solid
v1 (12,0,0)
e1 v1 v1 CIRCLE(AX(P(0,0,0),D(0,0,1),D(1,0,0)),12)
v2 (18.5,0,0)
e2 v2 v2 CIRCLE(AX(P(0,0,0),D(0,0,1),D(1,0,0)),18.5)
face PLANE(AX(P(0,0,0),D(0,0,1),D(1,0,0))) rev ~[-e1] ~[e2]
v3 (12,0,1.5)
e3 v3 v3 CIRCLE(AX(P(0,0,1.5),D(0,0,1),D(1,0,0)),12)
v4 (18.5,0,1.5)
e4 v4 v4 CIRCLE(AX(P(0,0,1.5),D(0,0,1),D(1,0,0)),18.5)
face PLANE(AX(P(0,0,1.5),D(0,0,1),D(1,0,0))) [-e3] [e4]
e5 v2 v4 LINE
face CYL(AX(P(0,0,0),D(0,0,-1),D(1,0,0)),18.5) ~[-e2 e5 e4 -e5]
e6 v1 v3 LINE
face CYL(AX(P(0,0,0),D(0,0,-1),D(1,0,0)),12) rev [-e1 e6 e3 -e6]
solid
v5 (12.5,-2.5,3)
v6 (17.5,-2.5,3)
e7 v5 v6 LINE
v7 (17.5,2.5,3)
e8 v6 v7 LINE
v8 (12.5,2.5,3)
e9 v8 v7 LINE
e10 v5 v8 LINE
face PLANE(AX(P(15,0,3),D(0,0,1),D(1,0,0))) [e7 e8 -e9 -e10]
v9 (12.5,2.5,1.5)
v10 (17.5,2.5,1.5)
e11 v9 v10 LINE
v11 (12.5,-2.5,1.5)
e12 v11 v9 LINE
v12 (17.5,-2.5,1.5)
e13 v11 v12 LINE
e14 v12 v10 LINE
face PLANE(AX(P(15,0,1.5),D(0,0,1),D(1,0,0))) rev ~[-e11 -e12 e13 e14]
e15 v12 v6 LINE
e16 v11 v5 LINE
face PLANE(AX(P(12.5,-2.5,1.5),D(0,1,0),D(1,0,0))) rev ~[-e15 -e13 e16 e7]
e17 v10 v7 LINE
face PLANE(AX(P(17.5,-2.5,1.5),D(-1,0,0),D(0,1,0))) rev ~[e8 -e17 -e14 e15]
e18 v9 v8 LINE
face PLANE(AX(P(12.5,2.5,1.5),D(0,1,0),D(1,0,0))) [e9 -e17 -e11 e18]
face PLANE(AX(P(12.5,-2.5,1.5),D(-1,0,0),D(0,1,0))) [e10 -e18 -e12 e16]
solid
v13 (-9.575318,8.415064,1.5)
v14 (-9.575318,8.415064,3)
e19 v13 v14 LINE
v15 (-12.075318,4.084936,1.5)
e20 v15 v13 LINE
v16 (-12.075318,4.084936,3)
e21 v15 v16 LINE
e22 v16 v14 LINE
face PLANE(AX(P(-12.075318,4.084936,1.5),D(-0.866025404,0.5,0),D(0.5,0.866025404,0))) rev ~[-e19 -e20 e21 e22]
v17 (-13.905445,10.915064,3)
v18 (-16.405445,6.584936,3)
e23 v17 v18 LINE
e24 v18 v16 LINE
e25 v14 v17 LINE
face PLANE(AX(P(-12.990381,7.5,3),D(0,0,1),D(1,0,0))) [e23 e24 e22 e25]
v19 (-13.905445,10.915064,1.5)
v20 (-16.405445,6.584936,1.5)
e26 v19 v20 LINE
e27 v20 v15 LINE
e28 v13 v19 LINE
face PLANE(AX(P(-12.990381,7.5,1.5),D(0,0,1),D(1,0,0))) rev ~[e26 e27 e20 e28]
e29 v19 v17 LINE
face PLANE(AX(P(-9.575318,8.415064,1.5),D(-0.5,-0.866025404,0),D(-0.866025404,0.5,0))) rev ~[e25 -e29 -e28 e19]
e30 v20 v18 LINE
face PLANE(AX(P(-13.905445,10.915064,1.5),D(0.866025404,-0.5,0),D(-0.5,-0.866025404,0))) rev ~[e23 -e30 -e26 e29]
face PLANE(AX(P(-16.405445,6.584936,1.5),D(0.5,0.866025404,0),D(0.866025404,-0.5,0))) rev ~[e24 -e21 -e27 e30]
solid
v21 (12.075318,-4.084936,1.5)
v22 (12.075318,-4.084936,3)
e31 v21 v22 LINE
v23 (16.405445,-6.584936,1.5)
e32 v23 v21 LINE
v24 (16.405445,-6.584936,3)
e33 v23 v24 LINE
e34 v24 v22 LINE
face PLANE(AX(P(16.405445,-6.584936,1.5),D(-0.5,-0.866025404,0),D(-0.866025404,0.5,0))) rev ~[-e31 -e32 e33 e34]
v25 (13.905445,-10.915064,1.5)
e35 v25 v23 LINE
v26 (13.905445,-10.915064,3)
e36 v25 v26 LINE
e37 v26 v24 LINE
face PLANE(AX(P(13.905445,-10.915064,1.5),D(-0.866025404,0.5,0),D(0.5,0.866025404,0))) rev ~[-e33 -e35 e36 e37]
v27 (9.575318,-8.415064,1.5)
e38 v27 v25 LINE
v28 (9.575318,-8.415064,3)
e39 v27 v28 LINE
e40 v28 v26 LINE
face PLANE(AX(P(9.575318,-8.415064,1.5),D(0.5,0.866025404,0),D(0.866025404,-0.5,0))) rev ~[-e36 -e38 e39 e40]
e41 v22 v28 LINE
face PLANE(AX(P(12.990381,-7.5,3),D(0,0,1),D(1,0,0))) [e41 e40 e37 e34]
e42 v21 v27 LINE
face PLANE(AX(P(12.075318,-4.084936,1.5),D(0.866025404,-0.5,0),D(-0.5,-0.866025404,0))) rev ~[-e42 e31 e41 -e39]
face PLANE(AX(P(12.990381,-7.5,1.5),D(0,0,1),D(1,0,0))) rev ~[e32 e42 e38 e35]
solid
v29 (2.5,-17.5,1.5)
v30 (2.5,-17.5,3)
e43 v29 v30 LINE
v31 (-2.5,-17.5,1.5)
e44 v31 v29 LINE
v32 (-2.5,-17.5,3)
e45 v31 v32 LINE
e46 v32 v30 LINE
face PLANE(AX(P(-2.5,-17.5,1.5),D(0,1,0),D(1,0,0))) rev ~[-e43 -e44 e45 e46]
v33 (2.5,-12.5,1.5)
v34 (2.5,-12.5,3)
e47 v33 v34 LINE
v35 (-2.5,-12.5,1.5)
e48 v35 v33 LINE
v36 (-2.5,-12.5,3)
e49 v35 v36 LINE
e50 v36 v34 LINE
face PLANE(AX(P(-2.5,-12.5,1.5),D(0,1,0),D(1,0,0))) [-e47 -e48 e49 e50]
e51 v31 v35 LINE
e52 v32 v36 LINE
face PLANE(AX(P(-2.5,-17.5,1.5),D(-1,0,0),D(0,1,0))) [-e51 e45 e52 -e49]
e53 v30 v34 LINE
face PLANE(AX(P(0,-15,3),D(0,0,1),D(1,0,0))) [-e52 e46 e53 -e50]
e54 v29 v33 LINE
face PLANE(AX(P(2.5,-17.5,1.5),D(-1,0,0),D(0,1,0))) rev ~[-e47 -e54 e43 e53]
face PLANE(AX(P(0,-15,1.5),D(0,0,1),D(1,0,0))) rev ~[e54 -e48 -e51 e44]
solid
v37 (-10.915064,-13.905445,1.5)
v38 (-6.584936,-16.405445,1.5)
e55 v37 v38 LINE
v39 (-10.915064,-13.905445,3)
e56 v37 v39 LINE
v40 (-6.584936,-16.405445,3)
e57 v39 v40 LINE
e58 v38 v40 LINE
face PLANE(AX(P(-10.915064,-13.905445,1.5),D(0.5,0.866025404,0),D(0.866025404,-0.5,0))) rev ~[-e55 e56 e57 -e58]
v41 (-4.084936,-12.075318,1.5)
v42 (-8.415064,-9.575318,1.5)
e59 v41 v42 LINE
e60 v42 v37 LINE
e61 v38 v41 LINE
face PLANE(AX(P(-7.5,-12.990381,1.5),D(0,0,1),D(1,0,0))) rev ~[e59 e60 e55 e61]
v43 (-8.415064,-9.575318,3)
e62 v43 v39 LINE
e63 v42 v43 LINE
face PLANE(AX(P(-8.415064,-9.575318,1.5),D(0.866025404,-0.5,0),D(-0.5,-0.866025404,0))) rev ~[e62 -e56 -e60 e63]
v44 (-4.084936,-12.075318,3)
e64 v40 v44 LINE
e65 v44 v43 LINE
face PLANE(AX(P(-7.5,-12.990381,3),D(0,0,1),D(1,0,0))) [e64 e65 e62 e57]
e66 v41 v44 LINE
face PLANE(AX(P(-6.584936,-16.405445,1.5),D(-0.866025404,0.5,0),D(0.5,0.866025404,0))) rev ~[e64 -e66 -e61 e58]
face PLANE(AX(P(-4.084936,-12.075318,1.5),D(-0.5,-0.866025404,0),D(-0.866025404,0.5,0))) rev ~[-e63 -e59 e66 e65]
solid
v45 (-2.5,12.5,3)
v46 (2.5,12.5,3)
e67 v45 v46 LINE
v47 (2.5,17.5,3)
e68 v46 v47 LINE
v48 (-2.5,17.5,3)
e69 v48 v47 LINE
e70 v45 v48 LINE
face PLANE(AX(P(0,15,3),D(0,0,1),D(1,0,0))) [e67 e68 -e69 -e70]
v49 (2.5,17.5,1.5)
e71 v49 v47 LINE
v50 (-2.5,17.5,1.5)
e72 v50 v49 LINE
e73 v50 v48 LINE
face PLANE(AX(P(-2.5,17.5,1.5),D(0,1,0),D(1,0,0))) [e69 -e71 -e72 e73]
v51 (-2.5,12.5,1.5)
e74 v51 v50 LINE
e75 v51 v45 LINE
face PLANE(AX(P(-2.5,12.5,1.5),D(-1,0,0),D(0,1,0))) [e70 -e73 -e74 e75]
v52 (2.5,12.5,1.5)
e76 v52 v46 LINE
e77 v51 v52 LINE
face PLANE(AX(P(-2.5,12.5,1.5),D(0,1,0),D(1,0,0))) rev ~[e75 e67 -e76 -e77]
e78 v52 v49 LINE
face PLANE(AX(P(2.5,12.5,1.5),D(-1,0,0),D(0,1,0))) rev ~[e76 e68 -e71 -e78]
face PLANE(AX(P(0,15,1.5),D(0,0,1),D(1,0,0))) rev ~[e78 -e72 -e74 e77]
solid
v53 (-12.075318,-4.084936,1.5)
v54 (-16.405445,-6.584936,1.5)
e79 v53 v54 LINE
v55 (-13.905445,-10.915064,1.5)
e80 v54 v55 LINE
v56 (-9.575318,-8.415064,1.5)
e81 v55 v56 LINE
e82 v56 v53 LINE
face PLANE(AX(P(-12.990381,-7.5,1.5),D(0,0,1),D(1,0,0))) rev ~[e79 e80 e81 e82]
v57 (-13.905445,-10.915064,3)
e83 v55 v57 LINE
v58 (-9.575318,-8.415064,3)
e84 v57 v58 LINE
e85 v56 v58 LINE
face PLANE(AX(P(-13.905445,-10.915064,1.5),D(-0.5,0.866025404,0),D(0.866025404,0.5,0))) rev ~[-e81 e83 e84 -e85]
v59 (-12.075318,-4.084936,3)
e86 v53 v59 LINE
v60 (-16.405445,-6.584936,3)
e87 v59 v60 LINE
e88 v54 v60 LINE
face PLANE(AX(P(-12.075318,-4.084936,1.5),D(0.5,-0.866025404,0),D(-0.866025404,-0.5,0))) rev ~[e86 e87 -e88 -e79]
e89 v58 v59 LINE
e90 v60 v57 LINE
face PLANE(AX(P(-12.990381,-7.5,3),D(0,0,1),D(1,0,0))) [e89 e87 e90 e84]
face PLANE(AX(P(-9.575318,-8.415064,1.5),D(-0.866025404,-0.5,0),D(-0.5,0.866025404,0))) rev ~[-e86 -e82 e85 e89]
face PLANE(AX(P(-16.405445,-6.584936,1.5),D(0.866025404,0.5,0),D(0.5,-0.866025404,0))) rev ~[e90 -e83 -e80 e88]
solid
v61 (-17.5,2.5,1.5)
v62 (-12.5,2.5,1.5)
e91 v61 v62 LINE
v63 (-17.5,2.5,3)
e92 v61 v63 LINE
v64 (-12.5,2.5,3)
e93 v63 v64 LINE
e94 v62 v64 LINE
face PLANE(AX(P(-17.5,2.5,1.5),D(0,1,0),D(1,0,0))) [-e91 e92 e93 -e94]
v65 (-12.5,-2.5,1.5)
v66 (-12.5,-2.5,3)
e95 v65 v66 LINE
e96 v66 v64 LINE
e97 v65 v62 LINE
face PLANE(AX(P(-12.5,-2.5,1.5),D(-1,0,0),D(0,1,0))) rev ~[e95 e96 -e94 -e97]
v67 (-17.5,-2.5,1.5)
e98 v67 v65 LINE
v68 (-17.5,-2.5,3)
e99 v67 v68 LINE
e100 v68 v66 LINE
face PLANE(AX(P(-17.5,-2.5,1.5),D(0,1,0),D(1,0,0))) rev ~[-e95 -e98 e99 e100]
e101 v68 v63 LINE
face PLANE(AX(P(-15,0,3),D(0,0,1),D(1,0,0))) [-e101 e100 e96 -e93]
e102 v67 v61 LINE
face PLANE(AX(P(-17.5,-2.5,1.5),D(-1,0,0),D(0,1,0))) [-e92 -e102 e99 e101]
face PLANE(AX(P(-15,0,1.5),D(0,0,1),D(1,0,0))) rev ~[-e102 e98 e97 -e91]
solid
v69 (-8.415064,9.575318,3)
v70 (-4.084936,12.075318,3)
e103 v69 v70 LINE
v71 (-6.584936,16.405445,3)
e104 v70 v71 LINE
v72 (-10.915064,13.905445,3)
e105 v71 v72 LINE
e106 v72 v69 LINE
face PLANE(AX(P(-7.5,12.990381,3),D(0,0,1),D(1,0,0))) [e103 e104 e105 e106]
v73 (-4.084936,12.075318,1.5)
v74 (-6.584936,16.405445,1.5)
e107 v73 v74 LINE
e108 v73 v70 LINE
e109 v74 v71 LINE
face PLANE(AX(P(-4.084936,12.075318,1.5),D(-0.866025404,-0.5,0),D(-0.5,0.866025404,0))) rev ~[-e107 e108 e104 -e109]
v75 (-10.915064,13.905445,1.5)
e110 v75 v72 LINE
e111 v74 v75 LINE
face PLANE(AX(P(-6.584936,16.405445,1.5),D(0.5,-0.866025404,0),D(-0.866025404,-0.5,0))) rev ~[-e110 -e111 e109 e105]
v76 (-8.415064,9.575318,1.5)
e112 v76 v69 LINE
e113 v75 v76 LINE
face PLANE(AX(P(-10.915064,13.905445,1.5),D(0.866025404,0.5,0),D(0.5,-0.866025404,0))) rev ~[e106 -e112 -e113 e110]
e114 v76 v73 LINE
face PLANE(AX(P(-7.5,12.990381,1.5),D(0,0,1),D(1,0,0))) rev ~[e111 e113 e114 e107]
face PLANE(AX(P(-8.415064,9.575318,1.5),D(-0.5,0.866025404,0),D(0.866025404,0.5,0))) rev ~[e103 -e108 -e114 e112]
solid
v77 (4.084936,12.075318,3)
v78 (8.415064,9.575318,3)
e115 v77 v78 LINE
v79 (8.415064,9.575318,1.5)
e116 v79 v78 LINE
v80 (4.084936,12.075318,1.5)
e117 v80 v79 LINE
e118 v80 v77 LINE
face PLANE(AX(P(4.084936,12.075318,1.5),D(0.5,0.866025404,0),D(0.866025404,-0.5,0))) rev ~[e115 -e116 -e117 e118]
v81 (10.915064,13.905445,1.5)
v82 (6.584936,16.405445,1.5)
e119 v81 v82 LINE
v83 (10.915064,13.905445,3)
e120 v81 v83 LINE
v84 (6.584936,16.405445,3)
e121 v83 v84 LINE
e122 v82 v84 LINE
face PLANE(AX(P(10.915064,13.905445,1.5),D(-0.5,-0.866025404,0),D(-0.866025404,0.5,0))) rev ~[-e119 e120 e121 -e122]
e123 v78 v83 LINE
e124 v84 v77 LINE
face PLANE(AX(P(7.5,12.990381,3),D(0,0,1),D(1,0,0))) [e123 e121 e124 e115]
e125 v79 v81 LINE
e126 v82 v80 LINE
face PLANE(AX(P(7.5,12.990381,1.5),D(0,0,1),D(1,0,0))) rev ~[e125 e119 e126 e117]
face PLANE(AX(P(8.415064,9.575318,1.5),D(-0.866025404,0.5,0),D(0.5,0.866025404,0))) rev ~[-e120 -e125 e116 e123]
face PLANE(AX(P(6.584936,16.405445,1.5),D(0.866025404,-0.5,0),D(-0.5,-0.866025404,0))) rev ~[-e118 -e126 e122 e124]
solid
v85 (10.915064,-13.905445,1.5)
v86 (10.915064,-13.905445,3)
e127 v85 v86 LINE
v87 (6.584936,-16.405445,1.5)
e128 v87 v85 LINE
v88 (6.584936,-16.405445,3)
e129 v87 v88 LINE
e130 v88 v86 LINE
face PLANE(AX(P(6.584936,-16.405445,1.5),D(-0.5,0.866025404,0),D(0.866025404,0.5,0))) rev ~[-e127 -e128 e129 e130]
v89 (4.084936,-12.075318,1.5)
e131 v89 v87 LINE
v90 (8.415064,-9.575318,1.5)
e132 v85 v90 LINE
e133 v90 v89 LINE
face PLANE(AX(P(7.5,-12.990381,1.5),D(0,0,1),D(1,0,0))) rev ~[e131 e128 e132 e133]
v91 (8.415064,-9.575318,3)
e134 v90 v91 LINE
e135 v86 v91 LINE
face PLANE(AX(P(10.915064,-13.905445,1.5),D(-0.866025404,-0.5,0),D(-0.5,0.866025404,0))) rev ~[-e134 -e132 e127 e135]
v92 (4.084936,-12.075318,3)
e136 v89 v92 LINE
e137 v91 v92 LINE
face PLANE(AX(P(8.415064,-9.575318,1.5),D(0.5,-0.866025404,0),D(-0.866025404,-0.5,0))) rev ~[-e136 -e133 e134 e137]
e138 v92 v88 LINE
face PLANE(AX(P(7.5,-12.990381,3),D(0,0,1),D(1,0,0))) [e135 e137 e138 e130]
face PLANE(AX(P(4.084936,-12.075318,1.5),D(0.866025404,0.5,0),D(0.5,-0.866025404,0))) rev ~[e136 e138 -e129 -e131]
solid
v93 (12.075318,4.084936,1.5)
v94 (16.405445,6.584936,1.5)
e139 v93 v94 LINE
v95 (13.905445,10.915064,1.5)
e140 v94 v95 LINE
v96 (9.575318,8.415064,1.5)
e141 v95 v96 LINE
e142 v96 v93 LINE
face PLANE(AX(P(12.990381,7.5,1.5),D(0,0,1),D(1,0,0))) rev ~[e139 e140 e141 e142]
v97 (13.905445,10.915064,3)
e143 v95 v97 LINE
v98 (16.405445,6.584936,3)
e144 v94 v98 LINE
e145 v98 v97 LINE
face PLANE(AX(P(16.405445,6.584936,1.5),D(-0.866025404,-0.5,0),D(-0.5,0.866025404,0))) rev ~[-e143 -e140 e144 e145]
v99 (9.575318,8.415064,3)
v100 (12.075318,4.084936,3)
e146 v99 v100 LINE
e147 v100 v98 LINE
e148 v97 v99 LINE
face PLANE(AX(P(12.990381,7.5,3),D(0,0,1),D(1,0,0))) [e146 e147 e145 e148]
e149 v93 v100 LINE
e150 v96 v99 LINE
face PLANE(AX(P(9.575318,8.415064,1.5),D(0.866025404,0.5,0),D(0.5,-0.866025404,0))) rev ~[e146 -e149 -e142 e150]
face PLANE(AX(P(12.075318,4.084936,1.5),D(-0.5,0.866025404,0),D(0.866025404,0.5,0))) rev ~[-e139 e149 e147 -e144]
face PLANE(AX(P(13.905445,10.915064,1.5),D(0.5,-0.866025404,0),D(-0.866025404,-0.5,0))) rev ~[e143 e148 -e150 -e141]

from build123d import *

# Parameters (mm, degrees)
F0_R     = 18.5
F0_R_2   = 12
F1_DEPTH = 1.5
F2_W     = 5
F2_H     = 5
F3_DEPTH = 1.5


# Not quite as in the source:
# - a feature of the source that left no trace in its solid (it failed there, or was rolled back) is left out


with BuildPart() as f1:
    # F0 (on Top) → F1 (new body)
    with BuildSketch(Plane.XY):
        Circle(F0_R)
        Circle(F0_R_2, mode=Mode.SUBTRACT)
    extrude(amount=F1_DEPTH)


with BuildPart() as f3:
    # F2 (on face) → F3 (new body)
    with BuildSketch(Plane.XY.offset(1.5)):
        with Locations((-15, 0)):
            Rectangle(F2_W, F2_H)
    extrude(amount=F3_DEPTH)


with BuildPart() as f3b:
    # F2 (on face) → F3, piece 2 (new body)
    with BuildSketch(Plane.XY.offset(1.5)):
        Polygon((-9.5753175473, -8.4150635095), (-12.0753175473, -4.0849364905), (-16.4054445662, -6.5849364905), (-13.9054445662, -10.9150635095), align=None)
    extrude(amount=F3_DEPTH)


with BuildPart() as f3c:
    # F2 (on face) → F3, piece 3 (new body)
    with BuildSketch(Plane.XY.offset(1.5)):
        Polygon((-4.0849364905, -12.0753175473), (-8.4150635095, -9.5753175473), (-10.9150635095, -13.9054445662), (-6.5849364905, -16.4054445662), align=None)
    extrude(amount=F3_DEPTH)


with BuildPart() as f3d:
    # F2 (on face) → F3, piece 4 (new body)
    with BuildSketch(Plane.XY.offset(1.5)):
        with Locations((0, -15)):
            Rectangle(F2_W, F2_H)
    extrude(amount=F3_DEPTH)


with BuildPart() as f3e:
    # F2 (on face) → F3, piece 5 (new body)
    with BuildSketch(Plane.XY.offset(1.5)):
        Polygon((8.4150635095, -9.5753175473), (4.0849364905, -12.0753175473), (6.5849364905, -16.4054445662), (10.9150635095, -13.9054445662), align=None)
    extrude(amount=F3_DEPTH)


with BuildPart() as f3f:
    # F2 (on face) → F3, piece 6 (new body)
    with BuildSketch(Plane.XY.offset(1.5)):
        Polygon((12.0753175473, -4.0849364905), (9.5753175473, -8.4150635095), (13.9054445662, -10.9150635095), (16.4054445662, -6.5849364905), align=None)
    extrude(amount=F3_DEPTH)


with BuildPart() as f3g:
    # F2 (on face) → F3, piece 7 (new body)
    with BuildSketch(Plane.XY.offset(1.5)):
        with Locations((15, 0)):
            Rectangle(F2_W, F2_H)
    extrude(amount=F3_DEPTH)


with BuildPart() as f3h:
    # F2 (on face) → F3, piece 8 (new body)
    with BuildSketch(Plane.XY.offset(1.5)):
        Polygon((9.5753175473, 8.4150635095), (12.0753175473, 4.0849364905), (16.4054445662, 6.5849364905), (13.9054445662, 10.9150635095), align=None)
    extrude(amount=F3_DEPTH)


with BuildPart() as f3i:
    # F2 (on face) → F3, piece 9 (new body)
    with BuildSketch(Plane.XY.offset(1.5)):
        Polygon((4.0849364905, 12.0753175473), (8.4150635095, 9.5753175473), (10.9150635095, 13.9054445662), (6.5849364905, 16.4054445662), align=None)
    extrude(amount=F3_DEPTH)


with BuildPart() as f3j:
    # F2 (on face) → F3, piece 10 (new body)
    with BuildSketch(Plane.XY.offset(1.5)):
        with Locations((0, 15)):
            Rectangle(F2_W, F2_H)
    extrude(amount=F3_DEPTH)


with BuildPart() as f3k:
    # F2 (on face) → F3, piece 11 (new body)
    with BuildSketch(Plane.XY.offset(1.5)):
        Polygon((-8.4150635095, 9.5753175473), (-4.0849364905, 12.0753175473), (-6.5849364905, 16.4054445662), (-10.9150635095, 13.9054445662), align=None)
    extrude(amount=F3_DEPTH)


with BuildPart() as f3l:
    # F2 (on face) → F3, piece 12 (new body)
    with BuildSketch(Plane.XY.offset(1.5)):
        Polygon((-12.0753175473, 4.0849364905), (-9.5753175473, 8.4150635095), (-13.9054445662, 10.9150635095), (-16.4054445662, 6.5849364905), align=None)
    extrude(amount=F3_DEPTH)


solid = Compound([f1.part, f3.part, f3b.part, f3c.part, f3d.part, f3e.part, f3f.part, f3g.part, f3h.part, f3i.part, f3j.part, f3k.part, f3l.part])
